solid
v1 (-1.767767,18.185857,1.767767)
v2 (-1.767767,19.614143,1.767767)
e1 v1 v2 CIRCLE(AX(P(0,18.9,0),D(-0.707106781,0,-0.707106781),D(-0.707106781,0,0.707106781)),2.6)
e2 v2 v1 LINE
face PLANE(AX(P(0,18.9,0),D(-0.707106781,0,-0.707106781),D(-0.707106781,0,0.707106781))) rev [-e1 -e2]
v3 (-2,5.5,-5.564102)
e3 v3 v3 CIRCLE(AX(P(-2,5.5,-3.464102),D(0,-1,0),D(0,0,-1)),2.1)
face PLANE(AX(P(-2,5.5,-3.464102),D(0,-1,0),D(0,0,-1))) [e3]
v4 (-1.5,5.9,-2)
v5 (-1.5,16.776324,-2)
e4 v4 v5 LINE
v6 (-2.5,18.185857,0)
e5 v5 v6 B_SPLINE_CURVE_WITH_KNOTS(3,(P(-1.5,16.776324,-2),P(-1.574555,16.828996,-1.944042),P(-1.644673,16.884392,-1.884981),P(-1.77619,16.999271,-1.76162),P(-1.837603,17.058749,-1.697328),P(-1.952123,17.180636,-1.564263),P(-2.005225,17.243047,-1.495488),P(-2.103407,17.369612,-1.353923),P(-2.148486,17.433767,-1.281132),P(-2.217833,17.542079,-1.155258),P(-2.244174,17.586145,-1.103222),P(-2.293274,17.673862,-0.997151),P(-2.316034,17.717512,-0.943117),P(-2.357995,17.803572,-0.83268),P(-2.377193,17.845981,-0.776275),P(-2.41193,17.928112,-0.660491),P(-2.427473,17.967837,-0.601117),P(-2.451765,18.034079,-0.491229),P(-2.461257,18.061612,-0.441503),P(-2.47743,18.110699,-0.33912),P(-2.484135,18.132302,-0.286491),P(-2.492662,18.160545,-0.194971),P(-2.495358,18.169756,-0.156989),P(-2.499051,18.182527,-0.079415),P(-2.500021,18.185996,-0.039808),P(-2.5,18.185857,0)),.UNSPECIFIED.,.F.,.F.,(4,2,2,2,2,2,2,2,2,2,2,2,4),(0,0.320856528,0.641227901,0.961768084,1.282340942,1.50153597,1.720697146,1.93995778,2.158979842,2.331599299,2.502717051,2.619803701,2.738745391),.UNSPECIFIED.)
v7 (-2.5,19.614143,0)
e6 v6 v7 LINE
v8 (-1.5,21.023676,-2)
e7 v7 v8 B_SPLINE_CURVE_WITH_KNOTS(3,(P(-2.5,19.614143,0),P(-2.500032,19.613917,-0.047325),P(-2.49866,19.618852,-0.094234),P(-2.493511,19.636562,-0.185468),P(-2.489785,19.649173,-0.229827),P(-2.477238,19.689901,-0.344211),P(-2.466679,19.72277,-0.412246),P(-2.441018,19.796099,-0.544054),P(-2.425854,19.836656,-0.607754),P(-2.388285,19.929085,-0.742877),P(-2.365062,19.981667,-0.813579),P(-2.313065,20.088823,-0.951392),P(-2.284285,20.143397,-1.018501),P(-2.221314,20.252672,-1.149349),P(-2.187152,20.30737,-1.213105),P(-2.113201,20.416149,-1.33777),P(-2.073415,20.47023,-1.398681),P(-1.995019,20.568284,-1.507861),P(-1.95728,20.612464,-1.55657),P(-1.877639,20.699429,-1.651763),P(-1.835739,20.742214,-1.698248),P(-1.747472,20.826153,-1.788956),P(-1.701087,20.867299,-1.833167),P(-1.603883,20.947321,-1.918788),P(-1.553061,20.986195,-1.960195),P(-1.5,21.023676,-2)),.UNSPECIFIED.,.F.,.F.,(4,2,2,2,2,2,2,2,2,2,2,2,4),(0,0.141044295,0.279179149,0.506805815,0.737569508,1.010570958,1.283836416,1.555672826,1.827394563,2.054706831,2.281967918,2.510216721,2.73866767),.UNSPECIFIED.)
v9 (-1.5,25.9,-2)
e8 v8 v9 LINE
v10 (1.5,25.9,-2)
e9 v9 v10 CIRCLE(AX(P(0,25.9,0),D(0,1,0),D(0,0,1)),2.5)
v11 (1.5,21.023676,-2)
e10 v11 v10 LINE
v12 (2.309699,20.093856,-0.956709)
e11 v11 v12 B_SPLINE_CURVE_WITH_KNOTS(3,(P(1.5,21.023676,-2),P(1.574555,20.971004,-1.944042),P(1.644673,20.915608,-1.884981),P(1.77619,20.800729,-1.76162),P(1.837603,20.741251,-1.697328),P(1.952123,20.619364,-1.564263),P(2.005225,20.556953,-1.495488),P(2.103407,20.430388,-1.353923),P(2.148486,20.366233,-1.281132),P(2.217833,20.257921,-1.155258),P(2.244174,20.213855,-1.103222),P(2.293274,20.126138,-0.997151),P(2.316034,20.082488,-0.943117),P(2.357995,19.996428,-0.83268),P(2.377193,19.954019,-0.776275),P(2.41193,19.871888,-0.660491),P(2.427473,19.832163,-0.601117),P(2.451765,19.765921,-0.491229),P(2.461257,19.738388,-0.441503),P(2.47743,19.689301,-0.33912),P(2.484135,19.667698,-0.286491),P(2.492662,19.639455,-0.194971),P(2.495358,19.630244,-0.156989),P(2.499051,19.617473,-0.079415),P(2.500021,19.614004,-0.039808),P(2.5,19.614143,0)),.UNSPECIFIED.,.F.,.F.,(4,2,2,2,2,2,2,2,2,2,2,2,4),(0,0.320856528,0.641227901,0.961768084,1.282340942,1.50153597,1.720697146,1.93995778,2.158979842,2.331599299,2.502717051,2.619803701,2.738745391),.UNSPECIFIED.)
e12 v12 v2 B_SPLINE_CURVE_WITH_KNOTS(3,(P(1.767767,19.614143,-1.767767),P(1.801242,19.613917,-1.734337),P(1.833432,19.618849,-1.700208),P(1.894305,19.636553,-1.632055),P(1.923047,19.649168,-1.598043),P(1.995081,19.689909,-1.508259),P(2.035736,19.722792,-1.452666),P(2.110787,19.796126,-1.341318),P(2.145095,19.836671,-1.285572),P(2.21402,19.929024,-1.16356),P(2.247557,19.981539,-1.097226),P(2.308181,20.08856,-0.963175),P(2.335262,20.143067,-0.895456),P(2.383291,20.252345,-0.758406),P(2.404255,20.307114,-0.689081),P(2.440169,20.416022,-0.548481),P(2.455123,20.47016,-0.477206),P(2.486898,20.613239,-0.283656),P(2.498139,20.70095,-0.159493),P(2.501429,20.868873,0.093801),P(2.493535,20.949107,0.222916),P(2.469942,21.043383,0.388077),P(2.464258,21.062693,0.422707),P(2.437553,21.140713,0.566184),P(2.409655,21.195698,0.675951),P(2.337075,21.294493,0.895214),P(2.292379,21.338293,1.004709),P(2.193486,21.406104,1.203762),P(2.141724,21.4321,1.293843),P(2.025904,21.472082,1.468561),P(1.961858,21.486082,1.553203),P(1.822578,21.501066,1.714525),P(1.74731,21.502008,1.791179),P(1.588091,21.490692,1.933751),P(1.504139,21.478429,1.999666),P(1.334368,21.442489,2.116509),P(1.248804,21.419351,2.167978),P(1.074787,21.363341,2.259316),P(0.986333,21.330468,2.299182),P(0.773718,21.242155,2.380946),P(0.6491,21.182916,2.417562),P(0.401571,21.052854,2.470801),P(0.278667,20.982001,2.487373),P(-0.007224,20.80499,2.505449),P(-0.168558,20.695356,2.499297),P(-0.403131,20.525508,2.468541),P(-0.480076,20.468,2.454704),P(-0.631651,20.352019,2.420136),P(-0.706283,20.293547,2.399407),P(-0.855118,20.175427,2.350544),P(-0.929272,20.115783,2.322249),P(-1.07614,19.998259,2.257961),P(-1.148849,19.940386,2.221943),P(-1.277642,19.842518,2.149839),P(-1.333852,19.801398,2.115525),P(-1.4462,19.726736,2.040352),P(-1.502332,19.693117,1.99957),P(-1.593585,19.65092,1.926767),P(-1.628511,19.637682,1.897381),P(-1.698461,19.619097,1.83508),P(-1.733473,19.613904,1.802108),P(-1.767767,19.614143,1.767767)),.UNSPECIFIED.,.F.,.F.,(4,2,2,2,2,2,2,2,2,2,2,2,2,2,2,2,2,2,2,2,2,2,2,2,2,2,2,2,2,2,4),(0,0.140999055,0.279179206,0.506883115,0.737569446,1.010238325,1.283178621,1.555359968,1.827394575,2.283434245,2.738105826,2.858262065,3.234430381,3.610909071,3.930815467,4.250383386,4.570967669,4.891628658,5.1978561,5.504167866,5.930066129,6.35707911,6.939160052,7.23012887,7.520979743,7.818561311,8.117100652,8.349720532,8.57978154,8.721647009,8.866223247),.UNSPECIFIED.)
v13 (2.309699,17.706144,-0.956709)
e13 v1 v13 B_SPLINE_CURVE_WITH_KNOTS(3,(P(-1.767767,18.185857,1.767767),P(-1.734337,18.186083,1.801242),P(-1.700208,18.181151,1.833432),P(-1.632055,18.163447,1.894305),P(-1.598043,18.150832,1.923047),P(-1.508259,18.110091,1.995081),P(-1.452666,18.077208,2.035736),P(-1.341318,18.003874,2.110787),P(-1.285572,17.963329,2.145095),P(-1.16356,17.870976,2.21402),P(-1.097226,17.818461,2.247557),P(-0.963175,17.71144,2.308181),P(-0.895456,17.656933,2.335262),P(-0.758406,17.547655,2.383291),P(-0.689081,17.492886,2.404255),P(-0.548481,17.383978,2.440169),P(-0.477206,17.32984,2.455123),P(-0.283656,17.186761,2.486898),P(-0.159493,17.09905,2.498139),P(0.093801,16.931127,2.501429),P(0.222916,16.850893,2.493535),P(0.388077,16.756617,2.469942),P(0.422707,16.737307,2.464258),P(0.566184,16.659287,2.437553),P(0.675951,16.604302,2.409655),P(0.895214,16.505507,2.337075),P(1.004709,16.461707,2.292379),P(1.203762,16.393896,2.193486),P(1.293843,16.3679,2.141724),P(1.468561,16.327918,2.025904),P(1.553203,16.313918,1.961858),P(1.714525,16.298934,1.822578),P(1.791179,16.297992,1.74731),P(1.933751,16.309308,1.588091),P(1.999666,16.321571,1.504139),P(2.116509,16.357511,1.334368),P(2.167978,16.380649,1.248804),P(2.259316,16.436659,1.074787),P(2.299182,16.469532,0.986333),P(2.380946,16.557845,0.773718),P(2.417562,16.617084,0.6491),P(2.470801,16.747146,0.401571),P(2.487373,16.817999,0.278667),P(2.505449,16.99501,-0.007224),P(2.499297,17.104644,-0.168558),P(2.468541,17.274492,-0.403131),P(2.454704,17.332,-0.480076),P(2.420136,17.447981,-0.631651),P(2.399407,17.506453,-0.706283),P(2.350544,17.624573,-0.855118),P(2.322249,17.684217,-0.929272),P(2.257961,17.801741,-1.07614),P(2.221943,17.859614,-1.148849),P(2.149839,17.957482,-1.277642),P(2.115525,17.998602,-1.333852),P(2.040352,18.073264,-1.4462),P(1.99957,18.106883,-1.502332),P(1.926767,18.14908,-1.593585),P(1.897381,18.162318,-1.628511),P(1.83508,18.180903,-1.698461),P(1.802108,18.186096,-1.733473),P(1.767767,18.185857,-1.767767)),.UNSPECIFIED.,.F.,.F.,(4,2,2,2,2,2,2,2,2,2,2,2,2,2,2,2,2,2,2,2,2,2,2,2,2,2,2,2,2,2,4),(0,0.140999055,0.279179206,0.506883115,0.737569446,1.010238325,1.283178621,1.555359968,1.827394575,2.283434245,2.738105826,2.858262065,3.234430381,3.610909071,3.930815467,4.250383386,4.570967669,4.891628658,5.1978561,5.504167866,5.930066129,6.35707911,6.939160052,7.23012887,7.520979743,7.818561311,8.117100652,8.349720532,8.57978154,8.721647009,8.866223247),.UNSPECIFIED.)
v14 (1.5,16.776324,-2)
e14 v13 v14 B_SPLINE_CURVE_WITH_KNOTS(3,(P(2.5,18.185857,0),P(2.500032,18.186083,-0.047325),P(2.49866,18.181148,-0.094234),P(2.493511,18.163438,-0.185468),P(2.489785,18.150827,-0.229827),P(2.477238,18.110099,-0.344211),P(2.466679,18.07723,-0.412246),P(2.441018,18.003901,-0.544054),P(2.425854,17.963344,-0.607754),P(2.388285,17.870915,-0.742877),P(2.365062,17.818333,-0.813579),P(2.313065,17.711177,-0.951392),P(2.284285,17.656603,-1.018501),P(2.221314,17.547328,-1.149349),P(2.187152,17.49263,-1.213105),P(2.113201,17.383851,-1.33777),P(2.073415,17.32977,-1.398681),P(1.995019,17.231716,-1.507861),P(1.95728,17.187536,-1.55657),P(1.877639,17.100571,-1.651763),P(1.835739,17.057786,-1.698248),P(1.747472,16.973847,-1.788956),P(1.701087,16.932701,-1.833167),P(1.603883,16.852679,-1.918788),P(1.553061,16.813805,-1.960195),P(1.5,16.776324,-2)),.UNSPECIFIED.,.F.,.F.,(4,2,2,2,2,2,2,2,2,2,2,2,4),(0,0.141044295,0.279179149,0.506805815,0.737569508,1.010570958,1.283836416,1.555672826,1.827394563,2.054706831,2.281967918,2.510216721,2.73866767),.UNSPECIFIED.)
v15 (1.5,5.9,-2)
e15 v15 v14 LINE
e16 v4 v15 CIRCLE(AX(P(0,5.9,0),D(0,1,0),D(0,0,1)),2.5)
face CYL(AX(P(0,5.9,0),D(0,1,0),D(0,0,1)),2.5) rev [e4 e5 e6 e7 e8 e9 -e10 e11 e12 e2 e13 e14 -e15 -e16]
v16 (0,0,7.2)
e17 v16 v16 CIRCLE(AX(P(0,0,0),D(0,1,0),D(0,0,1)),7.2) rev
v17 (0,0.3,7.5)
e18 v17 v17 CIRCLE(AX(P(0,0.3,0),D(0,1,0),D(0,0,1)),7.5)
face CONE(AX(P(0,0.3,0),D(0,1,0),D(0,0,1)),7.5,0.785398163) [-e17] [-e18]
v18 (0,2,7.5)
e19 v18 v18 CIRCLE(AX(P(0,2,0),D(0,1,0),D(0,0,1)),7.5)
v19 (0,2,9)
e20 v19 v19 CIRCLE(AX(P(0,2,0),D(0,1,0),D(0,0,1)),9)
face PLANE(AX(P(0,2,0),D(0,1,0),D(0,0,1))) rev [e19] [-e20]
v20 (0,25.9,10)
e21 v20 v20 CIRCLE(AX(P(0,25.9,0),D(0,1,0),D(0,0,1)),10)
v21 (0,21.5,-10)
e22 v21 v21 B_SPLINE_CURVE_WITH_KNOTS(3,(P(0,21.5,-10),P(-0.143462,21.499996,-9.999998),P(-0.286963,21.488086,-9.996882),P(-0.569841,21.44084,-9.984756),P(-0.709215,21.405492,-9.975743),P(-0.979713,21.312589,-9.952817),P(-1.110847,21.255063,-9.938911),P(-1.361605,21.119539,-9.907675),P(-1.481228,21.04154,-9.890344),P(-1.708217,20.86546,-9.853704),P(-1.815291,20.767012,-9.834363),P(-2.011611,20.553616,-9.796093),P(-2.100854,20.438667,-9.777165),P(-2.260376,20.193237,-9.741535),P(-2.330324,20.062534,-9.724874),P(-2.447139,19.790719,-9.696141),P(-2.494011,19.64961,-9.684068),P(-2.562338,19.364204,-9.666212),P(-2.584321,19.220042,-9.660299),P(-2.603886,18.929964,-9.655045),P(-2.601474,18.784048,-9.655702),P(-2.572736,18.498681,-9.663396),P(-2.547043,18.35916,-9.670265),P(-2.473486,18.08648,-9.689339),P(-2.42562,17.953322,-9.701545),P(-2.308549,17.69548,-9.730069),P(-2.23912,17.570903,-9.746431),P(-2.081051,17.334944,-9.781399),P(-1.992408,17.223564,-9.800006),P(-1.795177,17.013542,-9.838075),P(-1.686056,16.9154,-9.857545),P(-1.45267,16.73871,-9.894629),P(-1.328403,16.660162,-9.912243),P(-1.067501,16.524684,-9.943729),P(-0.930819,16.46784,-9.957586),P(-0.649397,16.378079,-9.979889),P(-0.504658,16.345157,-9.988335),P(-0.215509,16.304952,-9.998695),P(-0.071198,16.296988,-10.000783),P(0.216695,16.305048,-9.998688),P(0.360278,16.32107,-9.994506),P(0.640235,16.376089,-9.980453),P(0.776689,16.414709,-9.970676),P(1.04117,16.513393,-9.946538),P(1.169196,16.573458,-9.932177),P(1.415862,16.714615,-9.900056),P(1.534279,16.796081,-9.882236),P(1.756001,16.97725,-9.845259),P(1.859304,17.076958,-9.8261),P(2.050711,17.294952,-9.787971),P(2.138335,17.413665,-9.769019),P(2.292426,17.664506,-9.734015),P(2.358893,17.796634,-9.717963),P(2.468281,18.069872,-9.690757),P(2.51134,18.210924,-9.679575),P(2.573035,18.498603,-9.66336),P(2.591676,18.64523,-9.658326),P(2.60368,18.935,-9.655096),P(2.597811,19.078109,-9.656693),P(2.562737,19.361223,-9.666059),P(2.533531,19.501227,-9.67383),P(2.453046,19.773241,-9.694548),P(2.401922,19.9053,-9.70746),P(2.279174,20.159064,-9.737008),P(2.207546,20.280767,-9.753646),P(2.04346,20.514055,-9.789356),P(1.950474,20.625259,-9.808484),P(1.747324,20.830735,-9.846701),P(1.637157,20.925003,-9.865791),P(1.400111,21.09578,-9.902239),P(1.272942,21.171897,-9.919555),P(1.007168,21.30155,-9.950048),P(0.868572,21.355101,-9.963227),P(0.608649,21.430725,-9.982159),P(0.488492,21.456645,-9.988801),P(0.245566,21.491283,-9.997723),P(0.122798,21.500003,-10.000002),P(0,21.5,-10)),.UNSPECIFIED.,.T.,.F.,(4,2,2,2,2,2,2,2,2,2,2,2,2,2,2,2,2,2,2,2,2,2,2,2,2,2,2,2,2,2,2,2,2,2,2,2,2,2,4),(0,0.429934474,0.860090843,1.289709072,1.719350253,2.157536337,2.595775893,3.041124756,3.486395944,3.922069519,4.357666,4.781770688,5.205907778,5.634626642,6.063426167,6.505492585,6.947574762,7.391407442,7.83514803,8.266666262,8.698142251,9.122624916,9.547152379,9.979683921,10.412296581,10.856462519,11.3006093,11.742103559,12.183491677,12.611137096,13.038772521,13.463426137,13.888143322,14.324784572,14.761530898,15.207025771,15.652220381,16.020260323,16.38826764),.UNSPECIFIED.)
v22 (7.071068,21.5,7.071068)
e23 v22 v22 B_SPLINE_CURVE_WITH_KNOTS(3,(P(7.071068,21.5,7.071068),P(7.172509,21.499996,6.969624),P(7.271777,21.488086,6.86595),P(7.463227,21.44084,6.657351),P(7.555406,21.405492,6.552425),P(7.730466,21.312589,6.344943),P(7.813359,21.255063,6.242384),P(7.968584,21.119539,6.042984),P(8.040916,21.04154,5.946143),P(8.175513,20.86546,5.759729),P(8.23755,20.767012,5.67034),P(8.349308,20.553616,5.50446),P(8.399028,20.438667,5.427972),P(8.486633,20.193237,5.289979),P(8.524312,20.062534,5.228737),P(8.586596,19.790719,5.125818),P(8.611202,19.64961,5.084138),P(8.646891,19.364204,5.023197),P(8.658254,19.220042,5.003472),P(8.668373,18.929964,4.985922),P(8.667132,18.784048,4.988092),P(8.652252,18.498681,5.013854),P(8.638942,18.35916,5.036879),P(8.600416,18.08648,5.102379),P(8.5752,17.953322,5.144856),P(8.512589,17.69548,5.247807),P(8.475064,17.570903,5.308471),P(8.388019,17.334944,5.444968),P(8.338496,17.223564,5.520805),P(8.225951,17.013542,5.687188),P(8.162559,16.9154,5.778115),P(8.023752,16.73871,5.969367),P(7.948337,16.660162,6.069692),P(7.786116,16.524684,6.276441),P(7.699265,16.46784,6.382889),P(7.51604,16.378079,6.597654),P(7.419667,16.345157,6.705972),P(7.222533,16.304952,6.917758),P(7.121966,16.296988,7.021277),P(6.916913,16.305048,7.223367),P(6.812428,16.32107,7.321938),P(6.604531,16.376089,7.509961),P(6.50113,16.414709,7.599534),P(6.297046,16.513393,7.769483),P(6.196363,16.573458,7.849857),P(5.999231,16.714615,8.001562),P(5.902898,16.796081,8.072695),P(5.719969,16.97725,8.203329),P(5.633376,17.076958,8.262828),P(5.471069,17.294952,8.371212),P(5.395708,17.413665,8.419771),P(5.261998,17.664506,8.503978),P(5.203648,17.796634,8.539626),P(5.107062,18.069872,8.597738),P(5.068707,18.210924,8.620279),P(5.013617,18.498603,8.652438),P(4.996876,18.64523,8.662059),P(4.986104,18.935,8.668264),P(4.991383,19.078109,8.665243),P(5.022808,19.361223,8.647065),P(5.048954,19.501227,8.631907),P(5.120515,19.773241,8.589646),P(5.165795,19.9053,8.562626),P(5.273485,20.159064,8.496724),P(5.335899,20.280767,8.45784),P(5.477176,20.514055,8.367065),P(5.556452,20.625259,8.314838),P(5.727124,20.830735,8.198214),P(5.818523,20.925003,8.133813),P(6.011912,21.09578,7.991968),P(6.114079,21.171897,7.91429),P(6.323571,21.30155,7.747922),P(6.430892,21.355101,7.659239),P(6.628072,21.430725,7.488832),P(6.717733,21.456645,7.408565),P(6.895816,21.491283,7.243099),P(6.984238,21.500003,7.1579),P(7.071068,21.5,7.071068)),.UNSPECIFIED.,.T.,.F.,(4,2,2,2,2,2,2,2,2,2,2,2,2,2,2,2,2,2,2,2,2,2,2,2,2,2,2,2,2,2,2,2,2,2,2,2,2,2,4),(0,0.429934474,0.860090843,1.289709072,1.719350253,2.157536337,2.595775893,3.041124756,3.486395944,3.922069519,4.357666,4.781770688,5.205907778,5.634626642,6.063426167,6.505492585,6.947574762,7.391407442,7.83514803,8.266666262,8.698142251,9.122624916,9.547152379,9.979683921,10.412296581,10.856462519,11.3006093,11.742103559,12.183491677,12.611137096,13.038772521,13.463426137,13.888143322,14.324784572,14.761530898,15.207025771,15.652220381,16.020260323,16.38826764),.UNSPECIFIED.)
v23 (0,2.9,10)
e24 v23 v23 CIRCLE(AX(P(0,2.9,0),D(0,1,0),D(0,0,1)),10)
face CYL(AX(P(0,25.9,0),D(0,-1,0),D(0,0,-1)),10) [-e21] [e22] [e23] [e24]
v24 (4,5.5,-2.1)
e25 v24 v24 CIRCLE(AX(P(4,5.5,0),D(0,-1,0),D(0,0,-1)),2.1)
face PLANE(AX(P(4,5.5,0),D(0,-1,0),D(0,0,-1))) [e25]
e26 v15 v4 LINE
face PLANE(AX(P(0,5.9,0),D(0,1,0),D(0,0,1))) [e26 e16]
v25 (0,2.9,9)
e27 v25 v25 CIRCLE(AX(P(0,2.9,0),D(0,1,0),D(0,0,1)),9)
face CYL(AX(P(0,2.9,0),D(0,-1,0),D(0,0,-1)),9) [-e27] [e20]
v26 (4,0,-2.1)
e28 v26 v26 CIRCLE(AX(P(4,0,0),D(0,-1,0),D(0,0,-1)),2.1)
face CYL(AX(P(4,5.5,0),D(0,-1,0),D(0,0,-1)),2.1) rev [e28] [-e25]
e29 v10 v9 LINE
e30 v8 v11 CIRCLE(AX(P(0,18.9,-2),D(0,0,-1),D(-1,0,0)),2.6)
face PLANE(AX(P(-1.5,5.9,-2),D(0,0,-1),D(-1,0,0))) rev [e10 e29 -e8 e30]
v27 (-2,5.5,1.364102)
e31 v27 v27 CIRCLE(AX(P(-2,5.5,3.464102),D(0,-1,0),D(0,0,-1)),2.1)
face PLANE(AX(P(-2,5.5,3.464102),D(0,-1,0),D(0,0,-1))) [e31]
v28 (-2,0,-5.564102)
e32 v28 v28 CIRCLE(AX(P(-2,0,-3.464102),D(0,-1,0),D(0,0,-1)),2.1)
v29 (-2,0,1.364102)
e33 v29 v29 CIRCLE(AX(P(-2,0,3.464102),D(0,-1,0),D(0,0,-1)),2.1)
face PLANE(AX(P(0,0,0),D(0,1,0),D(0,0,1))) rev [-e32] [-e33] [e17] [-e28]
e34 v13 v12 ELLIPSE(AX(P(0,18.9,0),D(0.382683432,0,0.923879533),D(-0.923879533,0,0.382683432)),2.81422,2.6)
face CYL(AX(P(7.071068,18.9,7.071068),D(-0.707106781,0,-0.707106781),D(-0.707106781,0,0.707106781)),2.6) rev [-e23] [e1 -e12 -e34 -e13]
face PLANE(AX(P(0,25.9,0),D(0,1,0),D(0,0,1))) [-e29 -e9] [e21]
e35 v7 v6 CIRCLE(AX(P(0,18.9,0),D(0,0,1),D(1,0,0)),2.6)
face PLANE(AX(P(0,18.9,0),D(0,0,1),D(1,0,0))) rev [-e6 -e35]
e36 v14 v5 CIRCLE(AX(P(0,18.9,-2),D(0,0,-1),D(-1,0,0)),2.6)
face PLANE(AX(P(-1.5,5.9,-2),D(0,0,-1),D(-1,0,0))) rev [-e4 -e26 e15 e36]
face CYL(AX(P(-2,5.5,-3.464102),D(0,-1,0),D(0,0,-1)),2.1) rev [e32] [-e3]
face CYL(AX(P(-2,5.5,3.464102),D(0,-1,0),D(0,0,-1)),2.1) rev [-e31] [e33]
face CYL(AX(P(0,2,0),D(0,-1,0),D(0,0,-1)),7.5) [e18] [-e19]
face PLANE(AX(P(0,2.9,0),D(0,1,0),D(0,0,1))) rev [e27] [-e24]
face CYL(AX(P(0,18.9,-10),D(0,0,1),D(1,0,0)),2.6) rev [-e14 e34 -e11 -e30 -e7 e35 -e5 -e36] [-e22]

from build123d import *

# Parameters (mm, degrees)
SKETCH1_R             = 7.5
BOSS_EXTRUDE1_DEPTH   = 2
SKETCH2_R             = 9
BOSS_EXTRUDE2_DEPTH   = 0.9
SKETCH3_R             = 10
BOSS_EXTRUDE3_DEPTH   = 23
SKETCH5_R             = 2.1
CUT_EXTRUDE1_DEPTH    = 5.5
CUT_EXTRUDE2_DEPTH    = 20
SKETCH7_R             = 2.6
CUT_EXTRUDE3_DEPTH    = 30.509489999
CIRPATTERN1_OUTLINE_R = 2.6
CIRPATTERN1_DEPTH     = 10.0000001
CHAMFER1_SIZE         = 0.3


# Read off the part's stored shape, not the designer's step: CirPattern1
with BuildPart() as part:
    # Sketch1 → Boss-Extrude1 (new body)
    with BuildSketch(Plane(origin=(0, 0, 0), x_dir=(1, 0, 0), z_dir=(0, 1, 0))):
        with Locations(Location((0, 0, 0), (0, 0, 270))):
            Circle(SKETCH1_R)
    extrude(amount=BOSS_EXTRUDE1_DEPTH)

    # Sketch2 → Boss-Extrude2 (add)
    with BuildSketch(Plane(origin=(0, 2, 0), x_dir=(1, 0, 0), z_dir=(0, 1, 0))):
        with Locations(Location((0, 0, 0), (0, 0, 270))):
            Circle(SKETCH2_R)
    extrude(amount=BOSS_EXTRUDE2_DEPTH)

    # Sketch3 → Boss-Extrude3 (add)
    with BuildSketch(Plane(origin=(0, 2.9, 0), x_dir=(1, 0, 0), z_dir=(0, 1, 0))):
        with Locations(Location((0, 0, 0), (0, 0, 270))):
            Circle(SKETCH3_R)
    extrude(amount=BOSS_EXTRUDE3_DEPTH)

    # Sketch5 → Cut-Extrude1 (cut)
    with BuildSketch(Plane.XZ):
        with Locations(Location((4, 0, 0), (0, 0, 270))):
            Circle(SKETCH5_R)
        with Locations(Location((-2, -3.464101615, 0), (0, 0, 270))):
            Circle(SKETCH5_R)
        with Locations(Location((-2, 3.464101615, 0), (0, 0, 270))):
            Circle(SKETCH5_R)
    extrude(amount=-CUT_EXTRUDE1_DEPTH, mode=Mode.SUBTRACT)

    # Sketch6 → Cut-Extrude2 (cut)
    with BuildSketch(Plane(origin=(0, 25.9, 0), x_dir=(1, 0, 0), z_dir=(0, 1, 0))):
        with BuildLine():
            Line((-1.5, 2), (1.5, 2))
            ThreePointArc((1.5, 2), (0, -2.5), (-1.5, 2))
        make_face()
    extrude(amount=-CUT_EXTRUDE2_DEPTH, mode=Mode.SUBTRACT)

    # Sketch7 → Cut-Extrude3 (cut, through all)
    with BuildSketch(Plane.XY):
        with Locations(Location((0, 18.9, 0), (0, 0, 344.057631394))):
            Circle(SKETCH7_R)
    extrude(amount=-CUT_EXTRUDE3_DEPTH, mode=Mode.SUBTRACT)

    # CirPattern1 outline → CirPattern1 (cut)
    with BuildSketch(Plane(origin=(0, 0, 0), x_dir=(0.7071067811865509, 0, -0.707106781186544), z_dir=(0.707106781186544, 0, 0.707106781186551))):
        with Locations((0, 18.9)):
            Circle(CIRPATTERN1_OUTLINE_R)
    extrude(amount=CIRPATTERN1_DEPTH, mode=Mode.SUBTRACT)

    # Chamfer1
    chamfer1_edges = [part.edges().sort_by_distance(p)[0] for p in [
        (0, 0, -7.5),
    ]]
    chamfer(chamfer1_edges, length=CHAMFER1_SIZE)


solid = part.part
